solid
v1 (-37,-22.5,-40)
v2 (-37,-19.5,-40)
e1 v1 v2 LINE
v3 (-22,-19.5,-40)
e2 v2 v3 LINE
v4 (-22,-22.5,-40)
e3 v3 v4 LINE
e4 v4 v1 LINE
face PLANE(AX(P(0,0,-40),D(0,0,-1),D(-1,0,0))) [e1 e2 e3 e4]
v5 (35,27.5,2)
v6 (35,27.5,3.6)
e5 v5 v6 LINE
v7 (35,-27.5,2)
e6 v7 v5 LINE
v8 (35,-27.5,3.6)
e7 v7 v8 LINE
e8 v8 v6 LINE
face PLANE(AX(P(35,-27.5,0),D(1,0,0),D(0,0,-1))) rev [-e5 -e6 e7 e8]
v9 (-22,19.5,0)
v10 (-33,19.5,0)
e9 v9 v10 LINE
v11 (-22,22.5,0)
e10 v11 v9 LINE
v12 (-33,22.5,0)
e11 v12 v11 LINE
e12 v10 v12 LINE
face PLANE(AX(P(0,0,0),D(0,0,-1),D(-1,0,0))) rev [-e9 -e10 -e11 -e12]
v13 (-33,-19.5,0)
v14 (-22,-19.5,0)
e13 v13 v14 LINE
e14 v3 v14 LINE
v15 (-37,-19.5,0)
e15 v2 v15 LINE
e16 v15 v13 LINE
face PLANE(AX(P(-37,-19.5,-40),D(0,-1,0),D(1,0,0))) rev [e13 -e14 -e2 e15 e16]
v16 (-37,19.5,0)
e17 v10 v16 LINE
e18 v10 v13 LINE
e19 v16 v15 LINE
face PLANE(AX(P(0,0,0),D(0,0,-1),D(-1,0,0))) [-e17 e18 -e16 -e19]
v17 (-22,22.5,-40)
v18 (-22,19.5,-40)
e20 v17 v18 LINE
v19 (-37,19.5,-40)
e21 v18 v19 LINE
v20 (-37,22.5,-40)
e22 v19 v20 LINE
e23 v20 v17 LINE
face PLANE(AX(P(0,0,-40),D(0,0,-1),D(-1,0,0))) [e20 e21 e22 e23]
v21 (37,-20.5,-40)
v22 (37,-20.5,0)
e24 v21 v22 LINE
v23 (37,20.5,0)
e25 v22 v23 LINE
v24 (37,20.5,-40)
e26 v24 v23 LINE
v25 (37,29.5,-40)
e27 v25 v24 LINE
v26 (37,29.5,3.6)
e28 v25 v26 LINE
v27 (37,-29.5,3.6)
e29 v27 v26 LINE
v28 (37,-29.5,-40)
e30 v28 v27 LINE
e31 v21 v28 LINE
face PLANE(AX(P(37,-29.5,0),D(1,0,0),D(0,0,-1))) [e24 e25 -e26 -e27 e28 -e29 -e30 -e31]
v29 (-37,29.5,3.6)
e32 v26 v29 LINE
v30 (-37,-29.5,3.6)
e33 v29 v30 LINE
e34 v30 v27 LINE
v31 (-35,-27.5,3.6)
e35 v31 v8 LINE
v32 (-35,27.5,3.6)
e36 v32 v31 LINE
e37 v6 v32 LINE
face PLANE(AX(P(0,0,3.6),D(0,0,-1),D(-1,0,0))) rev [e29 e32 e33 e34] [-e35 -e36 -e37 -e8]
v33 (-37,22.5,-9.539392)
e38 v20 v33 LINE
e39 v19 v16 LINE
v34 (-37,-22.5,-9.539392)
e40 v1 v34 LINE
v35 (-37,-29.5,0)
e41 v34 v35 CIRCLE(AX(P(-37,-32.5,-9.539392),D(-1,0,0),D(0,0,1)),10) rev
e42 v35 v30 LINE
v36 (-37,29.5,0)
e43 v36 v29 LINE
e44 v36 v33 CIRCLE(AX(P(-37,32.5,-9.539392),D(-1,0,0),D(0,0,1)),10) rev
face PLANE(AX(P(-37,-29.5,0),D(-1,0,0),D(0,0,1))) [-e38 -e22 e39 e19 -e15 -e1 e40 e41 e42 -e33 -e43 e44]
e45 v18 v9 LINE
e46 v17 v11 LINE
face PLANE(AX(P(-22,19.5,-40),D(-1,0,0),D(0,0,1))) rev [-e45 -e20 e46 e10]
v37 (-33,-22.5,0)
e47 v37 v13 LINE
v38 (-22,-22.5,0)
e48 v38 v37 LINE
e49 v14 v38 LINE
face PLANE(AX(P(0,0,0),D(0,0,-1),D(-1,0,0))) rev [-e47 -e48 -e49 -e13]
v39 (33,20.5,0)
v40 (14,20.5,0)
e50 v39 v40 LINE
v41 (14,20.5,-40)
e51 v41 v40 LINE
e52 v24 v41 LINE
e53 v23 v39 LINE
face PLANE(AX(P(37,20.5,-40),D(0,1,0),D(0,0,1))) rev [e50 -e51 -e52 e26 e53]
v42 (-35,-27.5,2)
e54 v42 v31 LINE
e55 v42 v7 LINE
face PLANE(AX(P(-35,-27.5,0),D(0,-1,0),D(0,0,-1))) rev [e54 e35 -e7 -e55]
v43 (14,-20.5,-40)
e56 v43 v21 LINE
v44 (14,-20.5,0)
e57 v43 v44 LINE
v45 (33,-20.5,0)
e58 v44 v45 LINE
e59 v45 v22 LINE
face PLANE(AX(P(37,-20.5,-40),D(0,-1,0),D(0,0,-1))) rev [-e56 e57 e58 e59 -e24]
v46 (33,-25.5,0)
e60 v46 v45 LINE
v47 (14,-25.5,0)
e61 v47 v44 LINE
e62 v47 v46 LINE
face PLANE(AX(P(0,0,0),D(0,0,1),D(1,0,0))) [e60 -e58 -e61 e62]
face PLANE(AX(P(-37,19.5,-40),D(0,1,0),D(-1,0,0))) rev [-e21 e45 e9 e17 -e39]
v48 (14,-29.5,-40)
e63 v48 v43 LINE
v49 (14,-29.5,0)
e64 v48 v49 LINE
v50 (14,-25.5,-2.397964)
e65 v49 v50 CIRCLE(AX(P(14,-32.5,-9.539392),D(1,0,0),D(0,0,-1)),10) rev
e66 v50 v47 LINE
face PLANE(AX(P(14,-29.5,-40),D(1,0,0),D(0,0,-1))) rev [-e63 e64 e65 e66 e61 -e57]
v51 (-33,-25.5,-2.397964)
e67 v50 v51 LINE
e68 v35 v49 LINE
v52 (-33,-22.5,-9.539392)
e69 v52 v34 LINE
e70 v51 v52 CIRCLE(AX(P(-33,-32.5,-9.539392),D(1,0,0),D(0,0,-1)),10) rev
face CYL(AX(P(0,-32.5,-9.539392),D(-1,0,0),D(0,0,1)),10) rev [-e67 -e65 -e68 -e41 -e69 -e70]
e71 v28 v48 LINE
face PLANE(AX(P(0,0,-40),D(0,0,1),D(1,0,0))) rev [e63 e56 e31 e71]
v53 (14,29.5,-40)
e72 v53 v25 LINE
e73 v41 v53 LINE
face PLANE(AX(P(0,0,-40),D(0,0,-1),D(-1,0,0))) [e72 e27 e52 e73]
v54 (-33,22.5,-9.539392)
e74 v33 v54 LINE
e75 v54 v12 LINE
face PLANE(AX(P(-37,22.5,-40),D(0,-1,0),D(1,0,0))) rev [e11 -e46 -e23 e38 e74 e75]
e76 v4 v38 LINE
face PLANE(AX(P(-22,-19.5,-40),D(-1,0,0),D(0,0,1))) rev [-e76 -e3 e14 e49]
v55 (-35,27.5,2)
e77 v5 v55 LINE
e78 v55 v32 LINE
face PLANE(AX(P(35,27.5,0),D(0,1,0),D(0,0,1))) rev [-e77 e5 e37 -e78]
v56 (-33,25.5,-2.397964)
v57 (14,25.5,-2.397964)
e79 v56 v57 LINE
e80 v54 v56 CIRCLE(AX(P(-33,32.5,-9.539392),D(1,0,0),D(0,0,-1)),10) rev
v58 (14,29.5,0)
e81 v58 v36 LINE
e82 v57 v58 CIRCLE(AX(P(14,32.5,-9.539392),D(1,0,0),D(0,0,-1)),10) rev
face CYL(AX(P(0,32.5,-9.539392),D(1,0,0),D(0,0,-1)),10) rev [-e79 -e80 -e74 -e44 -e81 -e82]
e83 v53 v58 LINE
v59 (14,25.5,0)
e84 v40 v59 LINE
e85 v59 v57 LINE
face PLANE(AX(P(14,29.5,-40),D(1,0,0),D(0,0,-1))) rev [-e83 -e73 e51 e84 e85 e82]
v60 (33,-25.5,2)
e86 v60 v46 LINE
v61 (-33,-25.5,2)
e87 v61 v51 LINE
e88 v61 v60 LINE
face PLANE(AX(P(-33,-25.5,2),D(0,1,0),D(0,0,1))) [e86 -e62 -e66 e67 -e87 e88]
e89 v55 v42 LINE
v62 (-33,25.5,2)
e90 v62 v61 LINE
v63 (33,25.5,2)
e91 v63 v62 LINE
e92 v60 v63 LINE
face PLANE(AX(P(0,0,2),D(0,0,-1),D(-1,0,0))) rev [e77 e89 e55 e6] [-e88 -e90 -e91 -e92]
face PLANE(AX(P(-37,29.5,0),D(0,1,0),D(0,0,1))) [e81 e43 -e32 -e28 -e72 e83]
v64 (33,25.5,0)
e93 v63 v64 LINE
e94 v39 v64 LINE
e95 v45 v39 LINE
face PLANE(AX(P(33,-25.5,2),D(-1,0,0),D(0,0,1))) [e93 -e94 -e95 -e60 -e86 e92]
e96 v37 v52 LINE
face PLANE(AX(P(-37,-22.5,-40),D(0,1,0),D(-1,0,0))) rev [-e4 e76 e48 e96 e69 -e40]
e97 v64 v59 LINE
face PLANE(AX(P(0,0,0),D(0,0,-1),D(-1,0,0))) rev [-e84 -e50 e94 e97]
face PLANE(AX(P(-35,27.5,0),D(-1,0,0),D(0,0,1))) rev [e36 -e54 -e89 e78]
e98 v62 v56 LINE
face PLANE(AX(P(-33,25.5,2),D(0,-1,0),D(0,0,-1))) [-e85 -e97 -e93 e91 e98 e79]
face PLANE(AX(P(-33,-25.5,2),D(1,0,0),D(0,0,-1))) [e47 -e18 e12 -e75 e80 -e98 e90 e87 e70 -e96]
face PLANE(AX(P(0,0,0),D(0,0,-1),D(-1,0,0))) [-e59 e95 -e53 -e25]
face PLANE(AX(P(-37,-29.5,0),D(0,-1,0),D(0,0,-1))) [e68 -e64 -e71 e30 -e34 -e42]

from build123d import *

# Parameters (mm, degrees)
SKETCH1_W                = 70
SKETCH1_H                = 55
SKETCH1_W_2              = 66
SKETCH1_H_2              = 51
BOSS_EXTRUDE1_DEPTH      = 2
BOSS_EXTRUDE2_DEPTH      = 1.6
BOSS_EXTRUDE2_DEPTH_BACK = 2
SKETCH2_W                = 74
SKETCH2_H                = 59
SKETCH2_W_2              = 70
SKETCH2_H_2              = 55
SKETCH3_W                = 23
SKETCH3_H                = 9
SKETCH3_W_2              = 15
SKETCH3_H_2              = 3
BOSS_EXTRUDE3_DEPTH      = 40
FILLET1_START            = -37
FILLET1_DEPTH            = 70
FILLET1_2_DEPTH          = 4


with BuildPart() as part:
    # Sketch1 → Boss-Extrude1 (new body)
    with BuildSketch(Plane.XY):
        Rectangle(SKETCH1_W, SKETCH1_H)
        Rectangle(SKETCH1_W_2, SKETCH1_H_2, mode=Mode.SUBTRACT)
    extrude(amount=BOSS_EXTRUDE1_DEPTH)

    # Sketch2 → Boss-Extrude2 (add, two sides: drawn at the far end of the back side and taken through both)
    with BuildSketch(Plane.XY.offset(2).offset(-BOSS_EXTRUDE2_DEPTH_BACK)):
        Rectangle(SKETCH2_W, SKETCH2_H)
        Rectangle(SKETCH2_W_2, SKETCH2_H_2, mode=Mode.SUBTRACT)
    extrude(amount=BOSS_EXTRUDE2_DEPTH + BOSS_EXTRUDE2_DEPTH_BACK)

    # Sketch3 → Boss-Extrude3 (add)
    with BuildSketch(Plane(origin=(0, 0, 0), x_dir=(-1, 0, 0), z_dir=(0, 0, -1))):
        with Locations((-25.5, 25)):
            Rectangle(SKETCH3_W, SKETCH3_H)
        with Locations((-25.5, -25)):
            Rectangle(SKETCH3_W, SKETCH3_H)
        with Locations((29.5, 21)):
            Rectangle(SKETCH3_W_2, SKETCH3_H_2)
        with Locations((29.5, -21)):
            Rectangle(SKETCH3_W_2, SKETCH3_H_2)
    extrude(amount=BOSS_EXTRUDE3_DEPTH)

    # Fillet1: read off the stored shape, not the designer's step
    # Fillet1 outline → Fillet1 (add)
    with BuildSketch(Plane.YZ.offset(FILLET1_START)):
        with BuildLine():
            Line((29.5, 0), (25.5, 0))
            Line((25.5, 0), (25.5, -2.397963586))
            ThreePointArc((25.5, -2.397963586), (27.358253474, -0.962536958), (29.5, 0))
        make_face()
        with BuildLine():
            ThreePointArc((-29.5, 0), (-27.358253474, -0.962536958), (-25.5, -2.397963586))
            Line((-25.5, -2.397963586), (-25.5, 0))
            Line((-25.5, 0), (-29.5, 0))
        make_face()
    extrude(amount=FILLET1_DEPTH)

    # Fillet1 2 outline → Fillet1 2 (add)
    with BuildSketch(Plane.YZ.offset(FILLET1_START)):
        with BuildLine():
            Line((25.5, -2.397963586), (25.5, 0))
            Line((25.5, 0), (22.5, 0))
            Line((22.5, 0), (22.5, -9.539392014))
            ThreePointArc((22.5, -9.539392014), (23.280455543, -5.666408668), (25.5, -2.397963586))
        make_face()
        with BuildLine():
            Line((-25.5, 0), (-25.5, -2.397963586))
            ThreePointArc((-25.5, -2.397963586), (-23.280455543, -5.666408668), (-22.5, -9.539392014))
            Line((-22.5, -9.539392014), (-22.5, 0))
            Line((-22.5, 0), (-25.5, 0))
        make_face()
    extrude(amount=FILLET1_2_DEPTH)


solid = part.part
